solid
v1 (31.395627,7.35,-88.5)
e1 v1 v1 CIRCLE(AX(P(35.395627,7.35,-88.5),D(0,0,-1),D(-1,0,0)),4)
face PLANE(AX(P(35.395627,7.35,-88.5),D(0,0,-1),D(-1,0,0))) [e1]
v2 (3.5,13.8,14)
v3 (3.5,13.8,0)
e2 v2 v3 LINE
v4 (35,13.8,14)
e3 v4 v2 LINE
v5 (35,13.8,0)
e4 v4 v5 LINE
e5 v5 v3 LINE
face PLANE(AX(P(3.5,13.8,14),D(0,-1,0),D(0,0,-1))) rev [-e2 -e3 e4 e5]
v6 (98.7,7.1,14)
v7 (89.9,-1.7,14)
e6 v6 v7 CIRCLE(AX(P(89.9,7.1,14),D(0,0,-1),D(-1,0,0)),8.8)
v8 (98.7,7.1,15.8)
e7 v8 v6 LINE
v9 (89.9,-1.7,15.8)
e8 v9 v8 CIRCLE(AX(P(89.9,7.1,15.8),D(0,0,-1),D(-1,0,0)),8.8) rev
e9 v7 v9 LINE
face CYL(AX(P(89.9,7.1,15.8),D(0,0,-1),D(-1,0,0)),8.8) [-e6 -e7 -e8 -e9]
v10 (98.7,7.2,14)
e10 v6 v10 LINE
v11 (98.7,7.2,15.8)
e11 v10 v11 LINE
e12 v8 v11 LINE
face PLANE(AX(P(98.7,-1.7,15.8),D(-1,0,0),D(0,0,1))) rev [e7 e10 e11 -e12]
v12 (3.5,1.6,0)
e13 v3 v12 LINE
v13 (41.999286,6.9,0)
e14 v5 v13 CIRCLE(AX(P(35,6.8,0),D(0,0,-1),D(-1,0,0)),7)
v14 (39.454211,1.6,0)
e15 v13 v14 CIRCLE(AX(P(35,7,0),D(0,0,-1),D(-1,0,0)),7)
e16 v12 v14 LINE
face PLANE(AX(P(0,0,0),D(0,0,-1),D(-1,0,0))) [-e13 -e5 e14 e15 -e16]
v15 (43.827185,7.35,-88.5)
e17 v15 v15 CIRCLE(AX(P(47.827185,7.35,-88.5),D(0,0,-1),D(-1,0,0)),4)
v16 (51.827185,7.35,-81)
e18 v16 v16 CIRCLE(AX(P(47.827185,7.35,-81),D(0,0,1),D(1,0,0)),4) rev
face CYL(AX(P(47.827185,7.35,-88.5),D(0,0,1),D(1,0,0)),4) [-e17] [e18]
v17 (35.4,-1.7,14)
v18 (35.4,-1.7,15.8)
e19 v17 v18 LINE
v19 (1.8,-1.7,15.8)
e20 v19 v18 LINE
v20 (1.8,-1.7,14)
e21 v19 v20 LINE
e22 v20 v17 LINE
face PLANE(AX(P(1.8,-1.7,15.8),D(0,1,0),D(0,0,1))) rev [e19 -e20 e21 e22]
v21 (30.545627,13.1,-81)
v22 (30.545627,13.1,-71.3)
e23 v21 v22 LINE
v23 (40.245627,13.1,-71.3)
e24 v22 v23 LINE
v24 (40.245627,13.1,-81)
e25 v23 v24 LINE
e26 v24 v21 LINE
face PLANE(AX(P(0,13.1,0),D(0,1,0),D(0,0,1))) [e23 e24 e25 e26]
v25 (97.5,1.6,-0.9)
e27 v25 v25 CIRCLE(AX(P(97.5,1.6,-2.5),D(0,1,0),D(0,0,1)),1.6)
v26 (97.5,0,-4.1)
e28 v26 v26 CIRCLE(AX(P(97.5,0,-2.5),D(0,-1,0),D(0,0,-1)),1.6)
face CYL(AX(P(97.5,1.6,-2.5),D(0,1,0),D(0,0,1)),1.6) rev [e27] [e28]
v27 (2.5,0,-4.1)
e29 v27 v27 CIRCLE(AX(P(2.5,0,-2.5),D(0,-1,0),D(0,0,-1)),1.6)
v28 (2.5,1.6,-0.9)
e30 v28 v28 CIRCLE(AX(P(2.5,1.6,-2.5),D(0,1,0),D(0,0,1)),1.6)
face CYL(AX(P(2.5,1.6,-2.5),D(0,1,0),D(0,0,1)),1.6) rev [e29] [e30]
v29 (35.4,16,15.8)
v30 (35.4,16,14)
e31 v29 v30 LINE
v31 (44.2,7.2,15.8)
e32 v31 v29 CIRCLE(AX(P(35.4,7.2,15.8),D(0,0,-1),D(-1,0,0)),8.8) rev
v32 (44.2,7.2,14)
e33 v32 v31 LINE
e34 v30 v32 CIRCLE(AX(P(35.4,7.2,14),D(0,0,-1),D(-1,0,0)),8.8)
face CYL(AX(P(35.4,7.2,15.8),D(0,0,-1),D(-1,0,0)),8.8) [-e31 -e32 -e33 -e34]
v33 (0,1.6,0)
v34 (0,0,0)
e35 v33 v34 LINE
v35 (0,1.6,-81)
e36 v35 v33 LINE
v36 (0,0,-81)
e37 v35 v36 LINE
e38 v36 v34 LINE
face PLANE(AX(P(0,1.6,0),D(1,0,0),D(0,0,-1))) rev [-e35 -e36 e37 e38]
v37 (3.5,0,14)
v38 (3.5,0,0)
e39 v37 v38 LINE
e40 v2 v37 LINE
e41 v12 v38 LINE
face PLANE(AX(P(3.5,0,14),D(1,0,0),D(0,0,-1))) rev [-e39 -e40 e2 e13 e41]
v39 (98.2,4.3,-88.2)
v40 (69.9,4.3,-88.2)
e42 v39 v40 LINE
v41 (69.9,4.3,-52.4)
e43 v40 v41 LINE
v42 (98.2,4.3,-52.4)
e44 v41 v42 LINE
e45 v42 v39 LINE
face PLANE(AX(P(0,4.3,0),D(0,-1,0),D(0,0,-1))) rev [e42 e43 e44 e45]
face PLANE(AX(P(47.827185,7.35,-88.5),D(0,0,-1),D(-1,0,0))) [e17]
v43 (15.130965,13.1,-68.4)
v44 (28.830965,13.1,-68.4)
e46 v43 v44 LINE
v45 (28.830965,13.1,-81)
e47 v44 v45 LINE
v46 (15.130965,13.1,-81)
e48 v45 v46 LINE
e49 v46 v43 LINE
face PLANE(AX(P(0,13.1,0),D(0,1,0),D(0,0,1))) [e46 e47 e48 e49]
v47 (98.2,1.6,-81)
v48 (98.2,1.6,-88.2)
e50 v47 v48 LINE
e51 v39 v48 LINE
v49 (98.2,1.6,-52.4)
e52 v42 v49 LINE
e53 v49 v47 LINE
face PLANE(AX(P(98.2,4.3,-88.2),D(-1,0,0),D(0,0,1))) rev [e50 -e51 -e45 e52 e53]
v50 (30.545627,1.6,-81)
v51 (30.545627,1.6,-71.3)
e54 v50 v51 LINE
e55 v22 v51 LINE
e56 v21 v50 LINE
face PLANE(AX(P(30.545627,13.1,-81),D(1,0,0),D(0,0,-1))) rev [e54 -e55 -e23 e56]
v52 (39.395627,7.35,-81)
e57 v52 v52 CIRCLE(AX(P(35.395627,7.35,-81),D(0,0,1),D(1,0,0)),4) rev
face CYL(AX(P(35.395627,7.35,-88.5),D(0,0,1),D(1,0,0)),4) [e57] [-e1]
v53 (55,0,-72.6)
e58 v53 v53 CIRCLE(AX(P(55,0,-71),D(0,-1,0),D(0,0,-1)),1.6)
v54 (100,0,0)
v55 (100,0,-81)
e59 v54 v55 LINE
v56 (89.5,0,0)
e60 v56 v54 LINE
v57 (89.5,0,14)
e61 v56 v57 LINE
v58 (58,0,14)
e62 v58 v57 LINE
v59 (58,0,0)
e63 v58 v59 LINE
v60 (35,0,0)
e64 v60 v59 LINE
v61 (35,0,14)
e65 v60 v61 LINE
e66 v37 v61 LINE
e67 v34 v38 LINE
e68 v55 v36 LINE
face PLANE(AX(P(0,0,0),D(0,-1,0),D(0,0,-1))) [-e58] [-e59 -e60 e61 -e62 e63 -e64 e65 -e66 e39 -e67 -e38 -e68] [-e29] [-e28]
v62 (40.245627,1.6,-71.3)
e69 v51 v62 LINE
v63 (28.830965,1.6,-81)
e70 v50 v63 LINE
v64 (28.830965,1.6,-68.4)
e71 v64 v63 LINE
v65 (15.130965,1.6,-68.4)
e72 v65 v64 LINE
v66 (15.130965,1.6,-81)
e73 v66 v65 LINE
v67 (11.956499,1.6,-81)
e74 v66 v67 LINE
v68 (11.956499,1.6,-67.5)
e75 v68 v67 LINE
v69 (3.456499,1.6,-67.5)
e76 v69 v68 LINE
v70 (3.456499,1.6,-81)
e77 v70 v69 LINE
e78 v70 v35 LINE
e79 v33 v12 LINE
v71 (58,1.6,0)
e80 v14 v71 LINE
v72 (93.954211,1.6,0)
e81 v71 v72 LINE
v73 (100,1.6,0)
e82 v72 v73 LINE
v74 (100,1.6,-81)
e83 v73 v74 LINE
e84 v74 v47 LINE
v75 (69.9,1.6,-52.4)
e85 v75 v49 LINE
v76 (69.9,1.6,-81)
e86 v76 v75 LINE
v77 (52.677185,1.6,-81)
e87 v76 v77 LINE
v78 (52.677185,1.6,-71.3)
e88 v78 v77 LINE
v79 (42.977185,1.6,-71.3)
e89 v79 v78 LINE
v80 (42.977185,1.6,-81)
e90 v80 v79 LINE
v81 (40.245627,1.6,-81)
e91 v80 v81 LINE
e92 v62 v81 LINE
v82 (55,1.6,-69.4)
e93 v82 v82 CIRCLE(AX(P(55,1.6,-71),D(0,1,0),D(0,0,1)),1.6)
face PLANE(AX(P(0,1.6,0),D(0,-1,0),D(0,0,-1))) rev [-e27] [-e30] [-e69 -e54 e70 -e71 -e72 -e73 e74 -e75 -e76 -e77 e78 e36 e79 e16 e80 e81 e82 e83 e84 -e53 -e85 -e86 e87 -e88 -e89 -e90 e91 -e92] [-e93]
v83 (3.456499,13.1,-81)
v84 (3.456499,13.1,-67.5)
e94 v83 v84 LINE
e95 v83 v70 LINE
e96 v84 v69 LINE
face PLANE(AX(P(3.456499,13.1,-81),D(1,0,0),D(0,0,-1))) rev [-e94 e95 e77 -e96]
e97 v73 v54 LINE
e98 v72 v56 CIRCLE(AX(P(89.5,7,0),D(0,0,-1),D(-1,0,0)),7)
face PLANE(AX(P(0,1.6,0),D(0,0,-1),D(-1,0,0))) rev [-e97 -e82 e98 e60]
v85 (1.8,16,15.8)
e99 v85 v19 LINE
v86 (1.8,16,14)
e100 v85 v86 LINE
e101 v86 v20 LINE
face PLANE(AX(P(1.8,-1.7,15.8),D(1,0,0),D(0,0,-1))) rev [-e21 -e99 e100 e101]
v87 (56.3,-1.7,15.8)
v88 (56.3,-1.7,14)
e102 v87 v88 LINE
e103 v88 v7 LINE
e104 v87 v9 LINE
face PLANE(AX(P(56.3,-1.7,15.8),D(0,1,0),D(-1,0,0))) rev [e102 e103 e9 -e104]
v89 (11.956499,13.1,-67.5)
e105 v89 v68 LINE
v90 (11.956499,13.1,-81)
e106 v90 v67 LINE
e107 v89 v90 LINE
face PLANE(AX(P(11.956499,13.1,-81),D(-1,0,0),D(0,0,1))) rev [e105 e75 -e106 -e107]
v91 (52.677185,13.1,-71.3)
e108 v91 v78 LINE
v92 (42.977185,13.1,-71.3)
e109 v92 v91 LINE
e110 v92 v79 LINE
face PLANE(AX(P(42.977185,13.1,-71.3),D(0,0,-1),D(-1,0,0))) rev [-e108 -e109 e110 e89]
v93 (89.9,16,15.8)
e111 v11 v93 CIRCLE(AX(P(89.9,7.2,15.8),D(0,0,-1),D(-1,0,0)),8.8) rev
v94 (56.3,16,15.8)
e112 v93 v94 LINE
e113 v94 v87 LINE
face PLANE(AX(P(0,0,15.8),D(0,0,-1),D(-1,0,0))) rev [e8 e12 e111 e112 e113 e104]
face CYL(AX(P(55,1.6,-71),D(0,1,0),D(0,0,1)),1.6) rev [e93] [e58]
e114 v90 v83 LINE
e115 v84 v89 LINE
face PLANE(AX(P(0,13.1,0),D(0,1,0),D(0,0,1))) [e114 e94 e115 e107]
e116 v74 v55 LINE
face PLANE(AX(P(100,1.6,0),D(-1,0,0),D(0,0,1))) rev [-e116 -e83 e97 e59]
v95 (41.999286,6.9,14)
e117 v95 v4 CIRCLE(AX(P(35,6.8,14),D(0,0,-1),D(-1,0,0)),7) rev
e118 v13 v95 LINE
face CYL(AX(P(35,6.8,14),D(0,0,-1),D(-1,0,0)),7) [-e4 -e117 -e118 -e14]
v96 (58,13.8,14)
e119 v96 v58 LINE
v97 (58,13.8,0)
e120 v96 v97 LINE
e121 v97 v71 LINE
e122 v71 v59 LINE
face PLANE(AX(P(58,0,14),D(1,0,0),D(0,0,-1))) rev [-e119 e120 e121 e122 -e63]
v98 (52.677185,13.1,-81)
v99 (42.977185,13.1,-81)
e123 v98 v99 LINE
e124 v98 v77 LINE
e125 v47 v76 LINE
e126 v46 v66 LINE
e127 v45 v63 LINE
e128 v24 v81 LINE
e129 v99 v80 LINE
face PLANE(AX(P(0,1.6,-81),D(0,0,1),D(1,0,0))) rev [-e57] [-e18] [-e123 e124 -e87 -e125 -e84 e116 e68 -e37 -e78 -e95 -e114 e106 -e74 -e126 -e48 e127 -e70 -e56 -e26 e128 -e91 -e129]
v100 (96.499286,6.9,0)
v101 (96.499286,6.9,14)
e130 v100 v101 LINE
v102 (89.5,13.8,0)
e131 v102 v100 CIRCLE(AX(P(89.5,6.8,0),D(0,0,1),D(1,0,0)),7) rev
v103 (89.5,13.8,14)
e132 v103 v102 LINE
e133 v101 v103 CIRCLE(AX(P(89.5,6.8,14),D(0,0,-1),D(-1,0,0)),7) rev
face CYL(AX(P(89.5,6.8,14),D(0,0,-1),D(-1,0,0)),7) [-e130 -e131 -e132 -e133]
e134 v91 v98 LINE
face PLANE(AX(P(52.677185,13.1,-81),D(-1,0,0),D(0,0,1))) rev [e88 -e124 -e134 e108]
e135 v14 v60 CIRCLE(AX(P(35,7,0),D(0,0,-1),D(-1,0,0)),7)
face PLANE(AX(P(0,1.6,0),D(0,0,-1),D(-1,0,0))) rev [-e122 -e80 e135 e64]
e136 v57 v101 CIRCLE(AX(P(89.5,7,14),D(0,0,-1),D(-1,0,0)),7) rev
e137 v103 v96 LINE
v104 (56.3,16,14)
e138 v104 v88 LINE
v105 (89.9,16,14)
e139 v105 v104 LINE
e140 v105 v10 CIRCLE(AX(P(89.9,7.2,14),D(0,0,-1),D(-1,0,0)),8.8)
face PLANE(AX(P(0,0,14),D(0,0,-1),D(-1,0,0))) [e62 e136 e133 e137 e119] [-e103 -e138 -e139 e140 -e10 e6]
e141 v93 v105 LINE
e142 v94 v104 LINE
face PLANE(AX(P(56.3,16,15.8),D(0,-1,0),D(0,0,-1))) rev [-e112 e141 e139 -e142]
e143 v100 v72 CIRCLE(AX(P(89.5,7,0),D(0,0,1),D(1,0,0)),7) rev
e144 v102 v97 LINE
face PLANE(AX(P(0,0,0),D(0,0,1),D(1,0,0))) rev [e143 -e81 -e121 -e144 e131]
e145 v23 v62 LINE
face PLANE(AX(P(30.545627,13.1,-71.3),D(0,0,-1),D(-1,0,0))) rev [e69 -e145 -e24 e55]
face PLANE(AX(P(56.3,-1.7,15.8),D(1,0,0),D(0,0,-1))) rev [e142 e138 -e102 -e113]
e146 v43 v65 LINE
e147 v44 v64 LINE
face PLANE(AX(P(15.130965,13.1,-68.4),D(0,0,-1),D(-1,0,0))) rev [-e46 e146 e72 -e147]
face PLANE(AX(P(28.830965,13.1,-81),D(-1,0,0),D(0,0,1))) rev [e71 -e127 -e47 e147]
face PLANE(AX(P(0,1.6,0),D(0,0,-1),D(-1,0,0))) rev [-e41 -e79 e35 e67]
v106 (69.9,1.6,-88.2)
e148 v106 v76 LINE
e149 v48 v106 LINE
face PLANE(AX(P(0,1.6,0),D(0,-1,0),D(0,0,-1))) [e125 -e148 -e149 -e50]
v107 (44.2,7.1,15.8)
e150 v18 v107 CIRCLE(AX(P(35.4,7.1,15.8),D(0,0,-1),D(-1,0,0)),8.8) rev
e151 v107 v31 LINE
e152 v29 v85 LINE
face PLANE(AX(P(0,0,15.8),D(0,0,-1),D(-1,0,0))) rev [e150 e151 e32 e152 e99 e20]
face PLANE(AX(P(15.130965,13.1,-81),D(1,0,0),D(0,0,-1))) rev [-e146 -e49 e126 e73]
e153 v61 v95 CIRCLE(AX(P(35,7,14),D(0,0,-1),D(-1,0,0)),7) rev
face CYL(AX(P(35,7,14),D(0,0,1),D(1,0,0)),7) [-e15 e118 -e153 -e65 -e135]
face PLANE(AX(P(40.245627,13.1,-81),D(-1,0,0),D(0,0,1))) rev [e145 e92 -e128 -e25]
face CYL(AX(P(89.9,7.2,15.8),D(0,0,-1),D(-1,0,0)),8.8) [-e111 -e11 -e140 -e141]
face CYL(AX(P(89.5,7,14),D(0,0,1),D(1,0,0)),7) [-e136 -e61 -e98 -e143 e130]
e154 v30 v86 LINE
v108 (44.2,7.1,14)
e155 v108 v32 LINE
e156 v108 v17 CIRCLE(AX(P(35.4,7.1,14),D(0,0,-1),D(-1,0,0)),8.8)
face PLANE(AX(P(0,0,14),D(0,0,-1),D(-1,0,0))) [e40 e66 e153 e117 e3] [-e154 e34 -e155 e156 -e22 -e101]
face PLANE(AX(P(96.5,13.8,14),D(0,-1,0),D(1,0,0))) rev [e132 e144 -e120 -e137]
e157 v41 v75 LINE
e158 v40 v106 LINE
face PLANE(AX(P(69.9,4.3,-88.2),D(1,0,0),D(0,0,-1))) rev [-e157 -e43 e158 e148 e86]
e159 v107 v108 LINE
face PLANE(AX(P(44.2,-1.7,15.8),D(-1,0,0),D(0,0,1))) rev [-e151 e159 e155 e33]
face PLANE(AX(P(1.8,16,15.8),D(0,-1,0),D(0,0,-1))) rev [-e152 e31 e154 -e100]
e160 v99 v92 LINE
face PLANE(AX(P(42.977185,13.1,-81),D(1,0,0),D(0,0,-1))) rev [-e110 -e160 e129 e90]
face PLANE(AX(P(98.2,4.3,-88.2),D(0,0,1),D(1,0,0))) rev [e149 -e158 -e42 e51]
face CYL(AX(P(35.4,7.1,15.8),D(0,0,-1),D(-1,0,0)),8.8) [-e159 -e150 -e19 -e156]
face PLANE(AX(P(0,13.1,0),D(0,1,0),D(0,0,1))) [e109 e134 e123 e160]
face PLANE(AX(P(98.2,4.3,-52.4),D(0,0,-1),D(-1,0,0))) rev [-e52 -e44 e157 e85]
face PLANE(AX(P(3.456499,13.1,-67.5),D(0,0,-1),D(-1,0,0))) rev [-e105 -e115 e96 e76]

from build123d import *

# Parameters (mm, degrees)
SKETCH1_W            = 100
SKETCH1_H            = 81
BOSS_EXTRUDE1_DEPTH  = 1.6
SKETCH2_W            = 38.5
SKETCH2_H            = 13.8
BOSS_EXTRUDE2_DEPTH  = 14
SKETCH3_W            = 42.4
SKETCH3_H            = 17.7
BOSS_EXTRUDE3_DEPTH  = 1.8
SKETCH4_W            = 8.5
SKETCH4_H            = 13.5
SKETCH4_W_2          = 13.7
SKETCH4_H_2          = 12.6
SKETCH4_W_3          = 9.7
SKETCH4_H_3          = 9.7
BOSS_EXTRUDE4_DEPTH  = 11.5
SKETCH5_W            = 28.3
SKETCH5_H            = 35.8
BOSS_EXTRUDE5_DEPTH  = 2.7
SKETCH6_R            = 4
BOSS_EXTRUDE6_DEPTH  = 7.5
M3_CLEARANCE_SLOT1_D = 3.2
FILLET1_R            = 7
FILLET2_R            = 8.8


with BuildPart() as part:
    # Sketch1 → Boss-Extrude1 (new body)
    with BuildSketch(Plane(origin=(0, 0, 0), x_dir=(1, 0, 0), z_dir=(0, 1, 0))):
        with Locations((50, 40.5)):
            Rectangle(SKETCH1_W, SKETCH1_H)
    extrude(amount=BOSS_EXTRUDE1_DEPTH)

    # Sketch2 → Boss-Extrude2 (add)
    with BuildSketch(Plane.XY):
        with Locations((77.25, 6.9)):
            Rectangle(SKETCH2_W, SKETCH2_H)
        with Locations((22.75, 6.9)):
            Rectangle(SKETCH2_W, SKETCH2_H)
    extrude(amount=BOSS_EXTRUDE2_DEPTH)

    # Sketch3 → Boss-Extrude3 (add)
    with BuildSketch(Plane.XY.offset(14)):
        with Locations((23, 7.15)):
            Rectangle(SKETCH3_W, SKETCH3_H)
        with Locations((77.5, 7.15)):
            Rectangle(SKETCH3_W, SKETCH3_H)
    extrude(amount=BOSS_EXTRUDE3_DEPTH)

    # Sketch4 → Boss-Extrude4 (add)
    with BuildSketch(Plane(origin=(0, 1.6, 0), x_dir=(1, 0, 0), z_dir=(0, 1, 0))):
        with Locations((7.706498822, 74.25)):
            Rectangle(SKETCH4_W, SKETCH4_H)
        with Locations((21.980965093, 74.7)):
            Rectangle(SKETCH4_W_2, SKETCH4_H_2)
        with Locations((35.395626501, 76.15)):
            Rectangle(SKETCH4_W_3, SKETCH4_H_3)
        with Locations((47.82718522, 76.15)):
            Rectangle(SKETCH4_W_3, SKETCH4_H_3)
    extrude(amount=BOSS_EXTRUDE4_DEPTH)

    # Sketch5 → Boss-Extrude5 (add)
    with BuildSketch(Plane(origin=(0, 1.6, 0), x_dir=(1, 0, 0), z_dir=(0, 1, 0))):
        with Locations((84.05, 70.3)):
            Rectangle(SKETCH5_W, SKETCH5_H)
    extrude(amount=BOSS_EXTRUDE5_DEPTH)

    # Sketch6 → Boss-Extrude6 (add)
    with BuildSketch(Plane(origin=(0, 0, -81), x_dir=(-1, 0, 0), z_dir=(0, 0, -1))):
        with Locations(Location((-47.82718522, 7.35, 0), (0, 0, 180))):
            Circle(SKETCH6_R)
        with Locations(Location((-35.395626501, 7.35, 0), (0, 0, 180))):
            Circle(SKETCH6_R)
    extrude(amount=BOSS_EXTRUDE6_DEPTH)

    # M3 Clearance Slot1 (through all)
    with Locations(Plane(origin=(0, 1.6, 0), x_dir=(1, 0, 0), z_dir=(0, 1, 0))):
        with Locations((55, 71), (97.5, 2.5), (2.5, 2.5)):
            Hole(M3_CLEARANCE_SLOT1_D / 2)

    # Fillet1
    # the kernel refuses this fillet: 7 mm, written as the material it takes off along each edge
    with BuildSketch(Plane(origin=(42, 0, 0), x_dir=(-1, 0, 0), z_dir=(0, 0, 1)), Plane(origin=(96.5, 0, 0), x_dir=(-1, 0, 0), z_dir=(0, 0, 1))) as fillet1_piece_1:
        with BuildLine():
            CenterArc((FILLET1_R, -FILLET1_R), FILLET1_R, 90, 90)
            Line((0, -FILLET1_R), (0, 0))
            Line((0, 0), (FILLET1_R, 0))
        make_face()
    extrude(amount=14, mode=Mode.SUBTRACT)
    with BuildSketch(Plane(origin=(42, 13.8, -17.5), x_dir=(0, -1, 0), z_dir=(0, 0, 1)), Plane(origin=(96.5, 13.8, -17.5), x_dir=(0, -1, 0), z_dir=(0, 0, 1))) as fillet1_piece_2:
        with BuildLine():
            CenterArc((FILLET1_R, -FILLET1_R), FILLET1_R, 90, 90)
            Line((0, -FILLET1_R), (0, 0))
            Line((0, 0), (FILLET1_R, 0))
        make_face()
    extrude(amount=31.5, mode=Mode.SUBTRACT)

    # Fillet2
    fillet2_edges = [part.edges().sort_by_distance(p)[0] for p in [
        (44.2, -1.7, 14.9),
        (44.2, 16, 14.9),
        (98.7, -1.7, 14.9),
        (98.7, 16, 14.9),
    ]]
    fillet(fillet2_edges, radius=FILLET2_R)


solid = part.part
